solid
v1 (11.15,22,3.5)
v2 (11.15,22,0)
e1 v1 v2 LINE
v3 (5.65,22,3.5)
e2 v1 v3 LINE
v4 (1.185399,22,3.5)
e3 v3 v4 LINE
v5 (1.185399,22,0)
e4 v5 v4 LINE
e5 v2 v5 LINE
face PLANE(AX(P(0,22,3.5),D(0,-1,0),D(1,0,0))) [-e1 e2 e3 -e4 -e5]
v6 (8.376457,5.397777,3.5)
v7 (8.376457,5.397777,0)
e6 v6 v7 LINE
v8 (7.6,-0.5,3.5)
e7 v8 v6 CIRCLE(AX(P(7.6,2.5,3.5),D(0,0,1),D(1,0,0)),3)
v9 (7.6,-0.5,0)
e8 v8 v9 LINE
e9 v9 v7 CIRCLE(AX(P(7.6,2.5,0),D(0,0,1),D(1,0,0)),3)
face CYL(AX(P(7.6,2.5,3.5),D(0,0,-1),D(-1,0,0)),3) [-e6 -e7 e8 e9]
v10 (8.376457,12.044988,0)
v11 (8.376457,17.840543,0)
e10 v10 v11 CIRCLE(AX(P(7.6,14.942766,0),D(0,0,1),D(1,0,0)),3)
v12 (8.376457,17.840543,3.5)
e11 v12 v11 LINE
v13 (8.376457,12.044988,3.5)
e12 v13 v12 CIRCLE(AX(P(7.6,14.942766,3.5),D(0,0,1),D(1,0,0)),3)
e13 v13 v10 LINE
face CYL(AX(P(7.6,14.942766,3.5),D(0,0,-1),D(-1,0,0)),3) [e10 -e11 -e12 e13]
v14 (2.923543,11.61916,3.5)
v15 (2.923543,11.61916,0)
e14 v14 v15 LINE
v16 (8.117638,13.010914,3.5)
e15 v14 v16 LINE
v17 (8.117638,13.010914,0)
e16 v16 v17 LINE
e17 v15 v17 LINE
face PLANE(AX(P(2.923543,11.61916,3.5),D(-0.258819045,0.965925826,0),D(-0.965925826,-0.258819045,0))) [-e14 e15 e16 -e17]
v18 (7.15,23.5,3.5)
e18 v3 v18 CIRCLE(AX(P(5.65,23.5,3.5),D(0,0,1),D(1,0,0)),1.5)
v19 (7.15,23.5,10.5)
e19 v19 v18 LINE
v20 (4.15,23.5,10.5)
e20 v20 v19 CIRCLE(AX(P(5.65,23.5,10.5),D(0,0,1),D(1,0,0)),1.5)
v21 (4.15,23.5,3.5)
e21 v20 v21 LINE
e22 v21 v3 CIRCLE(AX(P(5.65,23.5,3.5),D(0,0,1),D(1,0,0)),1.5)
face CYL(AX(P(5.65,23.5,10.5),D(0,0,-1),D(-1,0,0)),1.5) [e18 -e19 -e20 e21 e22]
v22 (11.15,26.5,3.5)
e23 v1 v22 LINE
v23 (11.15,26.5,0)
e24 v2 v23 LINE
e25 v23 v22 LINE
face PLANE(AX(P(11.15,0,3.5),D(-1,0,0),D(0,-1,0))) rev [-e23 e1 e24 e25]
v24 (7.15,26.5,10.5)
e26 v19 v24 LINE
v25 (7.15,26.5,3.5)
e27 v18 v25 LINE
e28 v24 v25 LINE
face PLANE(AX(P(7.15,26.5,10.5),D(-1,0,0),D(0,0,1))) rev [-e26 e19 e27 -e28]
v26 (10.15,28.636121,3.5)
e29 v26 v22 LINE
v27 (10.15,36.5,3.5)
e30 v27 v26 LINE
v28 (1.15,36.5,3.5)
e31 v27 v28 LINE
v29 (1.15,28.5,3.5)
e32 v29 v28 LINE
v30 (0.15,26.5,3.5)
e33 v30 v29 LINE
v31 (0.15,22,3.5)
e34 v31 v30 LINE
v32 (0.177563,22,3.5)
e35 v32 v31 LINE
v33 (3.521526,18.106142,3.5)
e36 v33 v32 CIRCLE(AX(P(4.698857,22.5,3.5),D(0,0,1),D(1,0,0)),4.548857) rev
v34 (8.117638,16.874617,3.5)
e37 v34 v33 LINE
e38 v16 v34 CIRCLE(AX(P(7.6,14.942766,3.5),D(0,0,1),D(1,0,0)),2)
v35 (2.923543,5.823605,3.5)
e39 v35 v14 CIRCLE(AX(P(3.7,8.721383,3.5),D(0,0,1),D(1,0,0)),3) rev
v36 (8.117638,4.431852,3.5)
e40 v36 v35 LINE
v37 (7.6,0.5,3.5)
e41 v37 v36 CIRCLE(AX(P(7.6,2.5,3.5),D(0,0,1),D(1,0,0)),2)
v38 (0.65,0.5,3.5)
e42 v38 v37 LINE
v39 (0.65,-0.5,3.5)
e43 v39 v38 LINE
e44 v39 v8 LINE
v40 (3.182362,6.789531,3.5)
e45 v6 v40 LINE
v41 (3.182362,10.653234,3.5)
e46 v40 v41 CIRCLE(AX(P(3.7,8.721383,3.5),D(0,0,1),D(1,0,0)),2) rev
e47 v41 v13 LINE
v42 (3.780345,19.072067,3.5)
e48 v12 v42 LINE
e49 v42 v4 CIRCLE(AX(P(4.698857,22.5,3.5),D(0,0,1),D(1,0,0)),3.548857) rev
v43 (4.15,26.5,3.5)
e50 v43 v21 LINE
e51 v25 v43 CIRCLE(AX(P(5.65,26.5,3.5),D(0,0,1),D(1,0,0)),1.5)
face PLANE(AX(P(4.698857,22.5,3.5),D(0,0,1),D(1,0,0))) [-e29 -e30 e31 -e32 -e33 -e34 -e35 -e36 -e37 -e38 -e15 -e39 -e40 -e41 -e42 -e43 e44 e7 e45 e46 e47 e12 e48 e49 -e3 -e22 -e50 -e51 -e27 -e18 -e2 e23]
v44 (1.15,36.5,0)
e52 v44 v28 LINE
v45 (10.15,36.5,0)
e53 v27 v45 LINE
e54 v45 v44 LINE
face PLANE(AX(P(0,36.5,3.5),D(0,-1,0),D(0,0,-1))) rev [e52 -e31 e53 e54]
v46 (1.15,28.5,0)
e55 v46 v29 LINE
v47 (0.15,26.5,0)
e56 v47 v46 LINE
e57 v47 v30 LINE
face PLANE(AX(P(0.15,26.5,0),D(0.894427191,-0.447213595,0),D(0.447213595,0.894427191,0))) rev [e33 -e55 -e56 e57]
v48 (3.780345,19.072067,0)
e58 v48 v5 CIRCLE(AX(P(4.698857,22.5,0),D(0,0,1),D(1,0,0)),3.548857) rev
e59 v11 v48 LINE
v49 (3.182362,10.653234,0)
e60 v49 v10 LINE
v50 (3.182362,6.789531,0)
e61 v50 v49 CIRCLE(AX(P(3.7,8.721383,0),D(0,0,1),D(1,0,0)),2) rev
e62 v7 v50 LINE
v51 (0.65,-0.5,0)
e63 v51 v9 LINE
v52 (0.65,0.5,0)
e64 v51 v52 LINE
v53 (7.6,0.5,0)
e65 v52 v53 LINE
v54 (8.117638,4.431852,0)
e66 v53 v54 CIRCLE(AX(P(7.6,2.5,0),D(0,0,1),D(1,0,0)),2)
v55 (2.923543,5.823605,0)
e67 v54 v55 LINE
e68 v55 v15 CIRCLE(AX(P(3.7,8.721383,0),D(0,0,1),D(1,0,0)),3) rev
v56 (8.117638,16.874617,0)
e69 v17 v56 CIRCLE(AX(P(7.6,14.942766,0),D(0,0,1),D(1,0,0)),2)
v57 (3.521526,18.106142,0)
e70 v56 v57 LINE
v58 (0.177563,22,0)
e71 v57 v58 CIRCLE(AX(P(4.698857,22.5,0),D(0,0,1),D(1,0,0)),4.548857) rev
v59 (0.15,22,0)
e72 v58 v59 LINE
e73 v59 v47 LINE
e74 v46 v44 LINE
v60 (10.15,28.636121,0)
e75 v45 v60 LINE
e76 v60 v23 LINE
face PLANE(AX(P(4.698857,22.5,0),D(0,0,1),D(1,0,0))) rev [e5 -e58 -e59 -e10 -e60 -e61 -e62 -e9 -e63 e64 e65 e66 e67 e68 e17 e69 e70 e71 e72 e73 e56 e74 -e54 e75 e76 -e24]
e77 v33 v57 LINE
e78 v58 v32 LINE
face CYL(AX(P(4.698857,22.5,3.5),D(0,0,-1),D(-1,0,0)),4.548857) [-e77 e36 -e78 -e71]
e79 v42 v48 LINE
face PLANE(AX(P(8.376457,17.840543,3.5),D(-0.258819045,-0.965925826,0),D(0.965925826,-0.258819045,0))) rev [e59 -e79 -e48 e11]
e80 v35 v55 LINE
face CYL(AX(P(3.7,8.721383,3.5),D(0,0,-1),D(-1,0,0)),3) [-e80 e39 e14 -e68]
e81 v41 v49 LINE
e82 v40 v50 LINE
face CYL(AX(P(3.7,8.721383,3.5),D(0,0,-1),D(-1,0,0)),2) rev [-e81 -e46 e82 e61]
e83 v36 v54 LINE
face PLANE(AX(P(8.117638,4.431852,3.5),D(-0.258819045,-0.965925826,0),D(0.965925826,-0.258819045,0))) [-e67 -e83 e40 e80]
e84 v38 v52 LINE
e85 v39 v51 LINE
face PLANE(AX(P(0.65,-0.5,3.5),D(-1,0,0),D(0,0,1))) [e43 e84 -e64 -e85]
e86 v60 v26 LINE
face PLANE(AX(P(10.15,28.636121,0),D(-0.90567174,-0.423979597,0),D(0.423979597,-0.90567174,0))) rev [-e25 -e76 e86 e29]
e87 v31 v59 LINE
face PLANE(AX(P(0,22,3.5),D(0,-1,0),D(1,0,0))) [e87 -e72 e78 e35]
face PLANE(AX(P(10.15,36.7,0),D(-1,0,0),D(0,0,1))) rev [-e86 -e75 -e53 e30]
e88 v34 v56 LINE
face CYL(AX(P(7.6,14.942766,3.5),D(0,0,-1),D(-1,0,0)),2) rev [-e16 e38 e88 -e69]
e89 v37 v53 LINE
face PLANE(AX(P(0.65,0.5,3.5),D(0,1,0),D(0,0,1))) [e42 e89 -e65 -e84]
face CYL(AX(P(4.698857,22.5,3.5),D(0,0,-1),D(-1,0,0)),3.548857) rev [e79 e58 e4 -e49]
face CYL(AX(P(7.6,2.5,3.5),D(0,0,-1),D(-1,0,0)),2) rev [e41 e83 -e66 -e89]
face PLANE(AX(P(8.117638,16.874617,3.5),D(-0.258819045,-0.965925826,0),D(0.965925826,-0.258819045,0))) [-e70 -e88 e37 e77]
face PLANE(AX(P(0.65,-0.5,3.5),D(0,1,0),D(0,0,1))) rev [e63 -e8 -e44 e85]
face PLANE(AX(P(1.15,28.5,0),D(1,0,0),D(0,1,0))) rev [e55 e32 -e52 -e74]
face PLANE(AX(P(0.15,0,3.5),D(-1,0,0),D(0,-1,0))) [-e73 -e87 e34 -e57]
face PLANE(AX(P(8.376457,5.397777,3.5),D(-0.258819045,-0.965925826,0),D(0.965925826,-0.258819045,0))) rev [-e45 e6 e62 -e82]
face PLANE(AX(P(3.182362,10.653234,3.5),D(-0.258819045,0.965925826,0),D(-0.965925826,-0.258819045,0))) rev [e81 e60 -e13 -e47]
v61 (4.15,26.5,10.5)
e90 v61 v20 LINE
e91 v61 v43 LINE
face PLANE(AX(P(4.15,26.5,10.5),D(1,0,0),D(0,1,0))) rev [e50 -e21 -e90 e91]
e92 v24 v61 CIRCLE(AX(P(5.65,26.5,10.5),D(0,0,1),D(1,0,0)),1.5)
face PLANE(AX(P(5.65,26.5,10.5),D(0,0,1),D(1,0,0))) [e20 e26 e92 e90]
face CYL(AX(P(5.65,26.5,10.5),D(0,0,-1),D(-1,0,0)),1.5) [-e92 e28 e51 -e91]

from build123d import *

# Parameters (mm, degrees)
EXTRUDE_THIN1_OUTLINE_W = 9
EXTRUDE_THIN1_OUTLINE_H = 12.5
EXTRUDE_THIN1_DEPTH     = 3.5
SKETCH1_3_W             = 10
SKETCH1_3_H             = 13.5
BOSS_EXTRUDE1_DEPTH     = 3.5
BOSS_EXTRUDE2_DEPTH     = 7
CUT_EXTRUDE1_DEPTH      = 39.801707437
CUT_EXTRUDE1_DEPTH_BACK = 39.801707437


# Read off the part's stored shape, not the designer's step: Extrude-Thin1
with BuildPart() as part:
    # Extrude-Thin1 outline → Extrude-Thin1 (new body)
    with BuildSketch(Plane.XY):
        with BuildLine():
            ThreePointArc((0.177562937, 22), (1.247898439, 19.536389911), (3.521526088, 18.106141657))
            Line((3.521526088, 18.106141657), (8.11763809, 16.874617158))
            ThreePointArc((8.11763809, 16.874617158), (9.6, 14.942765505), (8.11763809, 13.010913852))
            Line((8.11763809, 13.010913852), (2.923542865, 11.619160231))
            ThreePointArc((2.923542865, 11.619160231), (0.7, 8.721382753), (2.923542865, 5.823605274))
            Line((2.923542865, 5.823605274), (8.11763809, 4.431851653))
            ThreePointArc((8.11763809, 4.431851653), (9.582889723, 2.238947616), (7.6, 0.5))
            Line((7.6, 0.5), (0.65, 0.5))
            Line((0.65, 0.5), (0.65, -0.5))
            Line((0.65, -0.5), (7.6, -0.5))
            ThreePointArc((7.6, -0.5), (10.574334584, 2.108421424), (8.376457135, 5.397777479))
            Line((8.376457135, 5.397777479), (3.18236191, 6.7895311))
            ThreePointArc((3.18236191, 6.7895311), (1.7, 8.721382752), (3.18236191, 10.653234405))
            Line((3.18236191, 10.653234405), (8.376457135, 12.044988026))
            ThreePointArc((8.376457135, 12.044988026), (10.6, 14.942765505), (8.376457135, 17.840542984))
            Line((8.376457135, 17.840542984), (3.780345133, 19.072067483))
            ThreePointArc((3.780345133, 19.072067483), (2.042960507, 20.146152168), (1.185399159, 22))
            Line((1.185399159, 22), (11.15, 22))
            Line((11.15, 22), (11.15, 36.5))
            Line((11.15, 36.5), (0.15, 36.5))
            Line((0.15, 36.5), (0.15, 22))
            Line((0.15, 22), (0.177562937, 22))
        make_face()
        with Locations((5.65, 29.25)):
            Rectangle(EXTRUDE_THIN1_OUTLINE_W, EXTRUDE_THIN1_OUTLINE_H, mode=Mode.SUBTRACT)
    extrude(amount=EXTRUDE_THIN1_DEPTH)

    # Sketch1<3> → Boss-Extrude1 (add)
    with BuildSketch(Plane.XY):
        with Locations((5.65, 29.25)):
            Rectangle(SKETCH1_3_W, SKETCH1_3_H)
    extrude(amount=BOSS_EXTRUDE1_DEPTH)

    # Sketch2 → Boss-Extrude2 (add)
    with BuildSketch(Plane.XY.offset(3.5)):
        with BuildLine():
            Line((7.15, 26.5), (7.15, 23.5))
            ThreePointArc((7.15, 23.5), (5.65, 22), (4.15, 23.5))
            Line((4.15, 23.5), (4.15, 26.5))
            ThreePointArc((4.15, 26.5), (5.65, 28), (7.15, 26.5))
        make_face()
    extrude(amount=BOSS_EXTRUDE2_DEPTH)

    # Sketch3 → Cut-Extrude1 (cut, two sides: drawn at the far end of the back side and taken through both)
    with BuildSketch(Plane.XY.offset(3.5).offset(-CUT_EXTRUDE1_DEPTH_BACK)):
        Polygon((0.15, 26.5), (1.15, 28.5), (1.15, 36.7), (10.15, 36.7), (10.15, 28.636121044), (11.15, 26.5), (15.293937853, 34.999866887), (13.289839187, 39.280864223), (-0.624731021, 39.280864223), (-5.238216118, 36.366540163), align=None)
    extrude(amount=CUT_EXTRUDE1_DEPTH + CUT_EXTRUDE1_DEPTH_BACK, mode=Mode.SUBTRACT)


solid = part.part
